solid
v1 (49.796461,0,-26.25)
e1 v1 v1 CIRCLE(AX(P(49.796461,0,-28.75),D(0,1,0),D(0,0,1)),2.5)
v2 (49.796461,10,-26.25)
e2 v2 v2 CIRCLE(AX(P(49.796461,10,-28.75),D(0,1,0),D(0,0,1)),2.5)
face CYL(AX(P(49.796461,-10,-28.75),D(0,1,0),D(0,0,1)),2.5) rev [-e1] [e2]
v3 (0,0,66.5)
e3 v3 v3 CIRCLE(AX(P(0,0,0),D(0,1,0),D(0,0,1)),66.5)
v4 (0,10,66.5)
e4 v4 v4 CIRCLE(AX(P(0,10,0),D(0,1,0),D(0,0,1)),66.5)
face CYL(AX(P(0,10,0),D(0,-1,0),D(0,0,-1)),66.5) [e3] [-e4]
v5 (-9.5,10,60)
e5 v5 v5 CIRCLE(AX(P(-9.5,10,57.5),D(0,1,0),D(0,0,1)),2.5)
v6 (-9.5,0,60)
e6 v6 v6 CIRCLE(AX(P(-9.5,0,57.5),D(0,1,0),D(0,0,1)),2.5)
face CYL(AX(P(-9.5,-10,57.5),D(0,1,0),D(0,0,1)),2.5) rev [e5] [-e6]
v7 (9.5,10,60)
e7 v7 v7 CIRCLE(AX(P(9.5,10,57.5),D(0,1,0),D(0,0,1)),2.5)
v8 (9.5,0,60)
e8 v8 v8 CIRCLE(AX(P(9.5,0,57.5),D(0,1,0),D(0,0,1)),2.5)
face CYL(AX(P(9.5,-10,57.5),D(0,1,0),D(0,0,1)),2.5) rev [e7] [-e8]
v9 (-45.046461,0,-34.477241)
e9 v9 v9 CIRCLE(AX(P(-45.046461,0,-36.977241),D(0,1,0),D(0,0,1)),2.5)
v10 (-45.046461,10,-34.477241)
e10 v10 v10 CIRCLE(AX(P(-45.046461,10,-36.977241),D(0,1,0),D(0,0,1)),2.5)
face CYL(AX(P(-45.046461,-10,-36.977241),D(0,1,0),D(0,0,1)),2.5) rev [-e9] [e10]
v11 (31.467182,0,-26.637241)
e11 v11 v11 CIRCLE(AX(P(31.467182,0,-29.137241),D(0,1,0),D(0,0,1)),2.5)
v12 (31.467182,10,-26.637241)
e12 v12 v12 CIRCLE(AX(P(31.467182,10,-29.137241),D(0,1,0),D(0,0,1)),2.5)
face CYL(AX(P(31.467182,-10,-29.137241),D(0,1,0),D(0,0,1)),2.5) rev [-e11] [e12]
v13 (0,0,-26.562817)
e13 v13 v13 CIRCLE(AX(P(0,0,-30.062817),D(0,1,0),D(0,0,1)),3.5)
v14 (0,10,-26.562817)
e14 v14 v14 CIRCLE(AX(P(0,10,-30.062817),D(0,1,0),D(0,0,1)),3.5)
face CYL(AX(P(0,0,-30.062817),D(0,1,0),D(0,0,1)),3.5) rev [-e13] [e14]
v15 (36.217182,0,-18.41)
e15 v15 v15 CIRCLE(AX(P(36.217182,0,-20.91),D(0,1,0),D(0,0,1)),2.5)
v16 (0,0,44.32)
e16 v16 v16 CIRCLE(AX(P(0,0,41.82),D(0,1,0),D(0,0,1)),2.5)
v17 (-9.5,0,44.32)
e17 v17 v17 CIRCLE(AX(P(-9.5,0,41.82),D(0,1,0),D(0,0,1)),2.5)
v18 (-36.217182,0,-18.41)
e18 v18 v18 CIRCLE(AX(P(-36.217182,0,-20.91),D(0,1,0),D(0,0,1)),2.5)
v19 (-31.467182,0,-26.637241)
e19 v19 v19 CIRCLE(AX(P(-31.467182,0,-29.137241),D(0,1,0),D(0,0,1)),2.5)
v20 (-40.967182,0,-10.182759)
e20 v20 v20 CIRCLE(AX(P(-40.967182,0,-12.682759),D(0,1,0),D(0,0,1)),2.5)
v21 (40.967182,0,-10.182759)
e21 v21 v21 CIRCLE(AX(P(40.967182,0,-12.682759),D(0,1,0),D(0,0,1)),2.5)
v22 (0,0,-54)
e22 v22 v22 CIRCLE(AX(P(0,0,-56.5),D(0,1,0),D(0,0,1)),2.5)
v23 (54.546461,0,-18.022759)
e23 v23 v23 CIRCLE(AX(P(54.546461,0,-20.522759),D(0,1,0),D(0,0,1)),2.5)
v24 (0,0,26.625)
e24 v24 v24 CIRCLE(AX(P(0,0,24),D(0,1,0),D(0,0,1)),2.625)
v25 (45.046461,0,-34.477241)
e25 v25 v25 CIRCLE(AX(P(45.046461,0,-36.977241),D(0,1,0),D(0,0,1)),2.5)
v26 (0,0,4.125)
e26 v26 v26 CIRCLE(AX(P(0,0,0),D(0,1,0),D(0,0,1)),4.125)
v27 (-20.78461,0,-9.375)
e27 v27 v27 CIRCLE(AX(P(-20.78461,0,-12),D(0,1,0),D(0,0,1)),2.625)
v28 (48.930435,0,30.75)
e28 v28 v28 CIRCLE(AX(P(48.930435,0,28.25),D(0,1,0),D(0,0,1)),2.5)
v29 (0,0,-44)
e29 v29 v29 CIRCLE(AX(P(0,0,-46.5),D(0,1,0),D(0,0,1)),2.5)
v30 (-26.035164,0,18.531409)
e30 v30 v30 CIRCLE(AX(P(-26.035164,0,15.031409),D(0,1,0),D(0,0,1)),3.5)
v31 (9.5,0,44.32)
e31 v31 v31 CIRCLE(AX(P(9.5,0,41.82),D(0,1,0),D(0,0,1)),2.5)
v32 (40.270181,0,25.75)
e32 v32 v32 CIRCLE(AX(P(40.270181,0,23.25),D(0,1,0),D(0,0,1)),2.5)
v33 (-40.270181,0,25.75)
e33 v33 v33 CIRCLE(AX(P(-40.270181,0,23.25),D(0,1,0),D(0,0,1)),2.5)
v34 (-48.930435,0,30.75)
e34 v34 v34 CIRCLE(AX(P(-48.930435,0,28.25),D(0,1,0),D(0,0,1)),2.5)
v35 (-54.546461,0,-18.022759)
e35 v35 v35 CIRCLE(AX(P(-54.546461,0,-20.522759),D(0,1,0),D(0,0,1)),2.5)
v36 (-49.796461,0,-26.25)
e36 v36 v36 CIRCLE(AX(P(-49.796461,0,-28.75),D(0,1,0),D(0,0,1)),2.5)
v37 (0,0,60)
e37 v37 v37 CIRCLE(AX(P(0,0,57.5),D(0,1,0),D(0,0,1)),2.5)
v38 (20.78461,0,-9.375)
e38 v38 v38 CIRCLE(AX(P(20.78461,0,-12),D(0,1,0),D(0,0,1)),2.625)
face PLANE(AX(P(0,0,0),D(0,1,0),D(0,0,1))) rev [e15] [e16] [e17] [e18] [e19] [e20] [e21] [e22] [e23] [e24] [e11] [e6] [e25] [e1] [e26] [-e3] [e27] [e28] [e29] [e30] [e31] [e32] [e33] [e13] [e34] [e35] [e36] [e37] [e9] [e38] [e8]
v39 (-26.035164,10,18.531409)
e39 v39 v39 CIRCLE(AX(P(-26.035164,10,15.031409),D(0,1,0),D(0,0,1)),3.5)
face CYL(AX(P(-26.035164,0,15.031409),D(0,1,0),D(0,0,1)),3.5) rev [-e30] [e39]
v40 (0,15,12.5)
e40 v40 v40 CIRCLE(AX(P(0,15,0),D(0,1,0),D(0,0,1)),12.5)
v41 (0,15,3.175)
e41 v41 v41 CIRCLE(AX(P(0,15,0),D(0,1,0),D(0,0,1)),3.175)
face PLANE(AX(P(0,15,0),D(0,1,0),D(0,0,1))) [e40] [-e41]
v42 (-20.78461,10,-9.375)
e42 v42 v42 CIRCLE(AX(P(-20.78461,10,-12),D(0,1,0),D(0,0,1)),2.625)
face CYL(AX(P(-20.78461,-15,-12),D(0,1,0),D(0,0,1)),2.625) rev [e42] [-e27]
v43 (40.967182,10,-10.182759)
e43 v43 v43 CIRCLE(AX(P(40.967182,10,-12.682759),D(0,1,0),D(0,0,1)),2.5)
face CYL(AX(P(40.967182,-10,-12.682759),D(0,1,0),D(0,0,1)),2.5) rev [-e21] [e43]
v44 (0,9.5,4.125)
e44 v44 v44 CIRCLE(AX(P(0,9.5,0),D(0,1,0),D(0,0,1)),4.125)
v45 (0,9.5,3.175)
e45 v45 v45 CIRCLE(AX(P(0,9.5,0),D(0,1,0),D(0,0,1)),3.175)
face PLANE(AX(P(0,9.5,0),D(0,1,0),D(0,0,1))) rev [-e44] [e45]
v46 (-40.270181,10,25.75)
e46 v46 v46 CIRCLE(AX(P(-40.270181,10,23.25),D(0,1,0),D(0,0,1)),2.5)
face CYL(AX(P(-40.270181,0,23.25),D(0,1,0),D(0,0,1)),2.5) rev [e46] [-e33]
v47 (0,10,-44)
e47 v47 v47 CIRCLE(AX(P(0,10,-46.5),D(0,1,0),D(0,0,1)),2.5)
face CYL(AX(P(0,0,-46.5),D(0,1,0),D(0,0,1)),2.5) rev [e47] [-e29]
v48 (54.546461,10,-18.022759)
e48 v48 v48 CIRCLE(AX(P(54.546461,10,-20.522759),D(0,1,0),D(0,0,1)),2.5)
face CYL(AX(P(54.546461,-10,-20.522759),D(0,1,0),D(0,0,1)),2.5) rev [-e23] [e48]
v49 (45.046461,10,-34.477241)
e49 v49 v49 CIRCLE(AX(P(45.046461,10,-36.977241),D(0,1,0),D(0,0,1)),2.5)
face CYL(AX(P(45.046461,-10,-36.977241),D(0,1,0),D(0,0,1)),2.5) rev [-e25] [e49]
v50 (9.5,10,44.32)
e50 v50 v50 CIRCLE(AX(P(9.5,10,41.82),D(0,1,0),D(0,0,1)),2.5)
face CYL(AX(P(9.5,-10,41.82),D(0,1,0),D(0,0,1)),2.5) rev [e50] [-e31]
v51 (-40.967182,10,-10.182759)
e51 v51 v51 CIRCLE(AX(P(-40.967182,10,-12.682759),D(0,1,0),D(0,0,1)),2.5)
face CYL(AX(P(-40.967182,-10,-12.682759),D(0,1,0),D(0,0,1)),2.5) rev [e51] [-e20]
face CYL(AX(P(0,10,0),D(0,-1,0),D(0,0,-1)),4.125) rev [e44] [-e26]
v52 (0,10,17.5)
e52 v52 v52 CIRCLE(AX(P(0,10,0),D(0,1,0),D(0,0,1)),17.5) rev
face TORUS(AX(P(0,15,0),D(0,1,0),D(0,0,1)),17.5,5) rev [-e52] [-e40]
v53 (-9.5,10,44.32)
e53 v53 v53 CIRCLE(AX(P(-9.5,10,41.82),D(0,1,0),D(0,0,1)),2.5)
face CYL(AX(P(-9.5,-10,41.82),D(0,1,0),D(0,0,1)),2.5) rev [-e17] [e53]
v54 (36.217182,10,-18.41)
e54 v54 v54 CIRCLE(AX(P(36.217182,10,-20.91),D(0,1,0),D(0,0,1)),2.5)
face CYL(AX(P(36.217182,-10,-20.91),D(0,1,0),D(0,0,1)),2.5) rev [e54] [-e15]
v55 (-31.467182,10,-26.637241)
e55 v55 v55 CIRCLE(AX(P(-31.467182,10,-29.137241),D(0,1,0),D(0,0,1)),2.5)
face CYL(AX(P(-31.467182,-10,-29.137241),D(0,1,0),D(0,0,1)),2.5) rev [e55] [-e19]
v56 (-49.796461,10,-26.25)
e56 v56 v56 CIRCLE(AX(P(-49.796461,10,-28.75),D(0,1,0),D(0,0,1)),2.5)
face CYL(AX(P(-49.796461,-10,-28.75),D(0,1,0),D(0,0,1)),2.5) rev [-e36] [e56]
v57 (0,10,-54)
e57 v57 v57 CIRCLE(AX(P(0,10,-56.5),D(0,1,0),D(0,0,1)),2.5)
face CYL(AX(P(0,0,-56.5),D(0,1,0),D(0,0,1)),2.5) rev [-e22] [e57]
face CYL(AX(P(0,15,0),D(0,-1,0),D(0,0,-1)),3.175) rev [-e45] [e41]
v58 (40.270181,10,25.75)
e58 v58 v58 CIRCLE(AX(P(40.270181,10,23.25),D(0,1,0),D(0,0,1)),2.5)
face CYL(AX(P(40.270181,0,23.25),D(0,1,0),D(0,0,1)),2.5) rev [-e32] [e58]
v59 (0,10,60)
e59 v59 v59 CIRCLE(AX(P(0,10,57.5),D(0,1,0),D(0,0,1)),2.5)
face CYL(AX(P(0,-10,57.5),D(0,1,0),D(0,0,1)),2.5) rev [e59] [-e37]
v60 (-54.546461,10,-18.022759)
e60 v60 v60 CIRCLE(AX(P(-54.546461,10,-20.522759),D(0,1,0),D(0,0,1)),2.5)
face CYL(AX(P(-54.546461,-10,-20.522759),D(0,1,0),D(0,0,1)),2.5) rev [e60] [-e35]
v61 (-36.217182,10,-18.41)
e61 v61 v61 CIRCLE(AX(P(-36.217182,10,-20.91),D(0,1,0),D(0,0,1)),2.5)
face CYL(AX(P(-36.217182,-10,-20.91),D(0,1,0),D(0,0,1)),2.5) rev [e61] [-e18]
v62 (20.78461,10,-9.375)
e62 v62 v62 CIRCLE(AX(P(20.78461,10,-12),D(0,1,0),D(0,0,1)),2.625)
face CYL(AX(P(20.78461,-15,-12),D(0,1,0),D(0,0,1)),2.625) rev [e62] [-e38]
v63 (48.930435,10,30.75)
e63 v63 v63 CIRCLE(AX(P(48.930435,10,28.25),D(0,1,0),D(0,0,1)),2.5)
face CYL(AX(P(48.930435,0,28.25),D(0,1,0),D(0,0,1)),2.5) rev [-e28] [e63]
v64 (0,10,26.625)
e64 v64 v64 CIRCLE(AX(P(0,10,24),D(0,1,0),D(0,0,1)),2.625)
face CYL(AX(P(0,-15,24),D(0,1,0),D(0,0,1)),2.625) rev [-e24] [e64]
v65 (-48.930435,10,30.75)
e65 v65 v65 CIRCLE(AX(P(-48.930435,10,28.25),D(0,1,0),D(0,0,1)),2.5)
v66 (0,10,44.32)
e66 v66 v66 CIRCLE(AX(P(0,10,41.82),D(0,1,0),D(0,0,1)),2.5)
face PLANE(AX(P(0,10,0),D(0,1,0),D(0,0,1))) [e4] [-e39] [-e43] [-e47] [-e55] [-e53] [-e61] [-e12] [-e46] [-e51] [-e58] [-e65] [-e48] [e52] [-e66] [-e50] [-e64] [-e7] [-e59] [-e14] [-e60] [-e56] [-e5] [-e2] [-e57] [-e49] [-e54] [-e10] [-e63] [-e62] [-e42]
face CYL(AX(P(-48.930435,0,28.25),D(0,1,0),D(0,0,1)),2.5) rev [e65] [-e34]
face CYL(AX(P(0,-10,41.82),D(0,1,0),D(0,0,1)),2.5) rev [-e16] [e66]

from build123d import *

# Parameters (mm, degrees)
BOSS_EXTRUDE7_DEPTH = 10
SKETCH1_23_R        = 65.000000017
SKETCH1_23_R_2      = 4.125
BOSS_EXTRUDE8_DEPTH = 10
CUT_EXTRUDE1_START  = 65
SKETCH16_R          = 2.5
CUT_EXTRUDE1_DEPTH  = 20
BOSS_EXTRUDE9_START = -0.5
SKETCH17_R          = 12.5
SKETCH17_R_2        = 3.175
BOSS_EXTRUDE9_DEPTH = 5.5
FILLET1_R           = 5
SKETCH18_R          = 2.5
SKETCH18_R_2        = 3.5
CUT_EXTRUDE2_DEPTH  = 10
SKETCH20_R          = 2.625
CUT_EXTRUDE11_DEPTH = 25


with BuildPart() as part:
    # Sketch1 → Boss-Extrude7 (new body)
    with BuildSketch(Plane(origin=(0, 0, 0), x_dir=(1, 0, 0), z_dir=(0, 1, 0))):
        with BuildLine():
            ThreePointArc((-10.099280768, -64.210626285), (-56.291651246, -32.5), (-60.65767394, 23.359079438))
            Line((-60.65767394, 23.359079438), (-64.257390064, 17.124188218))
            ThreePointArc((-64.257390064, 17.124188218), (-57.590689352, -33.25), (-17.298713017, -64.210626285))
            Line((-17.298713017, -64.210626285), (-10.099280768, -64.210626285))
        make_face()
        with BuildLine():
            Line((-64.257390064, 17.124188218), (-60.65767394, 23.359079438))
            ThreePointArc((-60.65767394, 23.359079438), (-60.639599413, 23.405960416), (-60.621488653, 23.452827409))
            Line((-60.621488653, 23.452827409), (-61.93581913, 24.211656463))
            ThreePointArc((-61.93581913, 24.211656463), (-63.196040724, 20.700493636), (-64.257390064, 17.124188218))
        make_face()
        with BuildLine():
            ThreePointArc((-60.621488653, 23.452827409), (-59.667920988, 25.782536821), (-58.624860802, 28.073576473))
            ThreePointArc((-58.624860802, 28.073576473), (-54.991019149, 34.65527107), (-50.621488653, 40.773335485))
            Line((-50.621488653, 40.773335485), (-51.93581913, 41.532164539))
            ThreePointArc((-51.93581913, 41.532164539), (-57.590689352, 33.25), (-61.93581913, 24.211656463))
            Line((-61.93581913, 24.211656463), (-60.621488653, 23.452827409))
        make_face()
        with BuildLine():
            ThreePointArc((-50.621488653, 40.773335485), (-50.589956027, 40.812453359), (-50.558393172, 40.851546848))
            Line((-50.558393172, 40.851546848), (-46.958677048, 47.086438068))
            ThreePointArc((-46.958677048, 47.086438068), (-49.525173722, 44.379129868), (-51.93581913, 41.532164539))
            Line((-51.93581913, 41.532164539), (-50.621488653, 40.773335485))
        make_face()
        with BuildLine():
            Line((-46.958677048, 47.086438068), (-50.558393172, 40.851546848))
            ThreePointArc((-50.558393172, 40.851546848), (0, 65), (50.558393172, 40.851546848))
            Line((50.558393172, 40.851546848), (46.958677048, 47.086438068))
            ThreePointArc((46.958677048, 47.086438068), (0, 66.5), (-46.958677048, 47.086438068))
        make_face()
        with BuildLine():
            Line((46.958677048, 47.086438068), (50.558393172, 40.851546848))
            ThreePointArc((50.558393172, 40.851546848), (50.589956027, 40.812453359), (50.621488653, 40.773335485))
            Line((50.621488653, 40.773335485), (51.93581913, 41.532164539))
            ThreePointArc((51.93581913, 41.532164539), (49.525173722, 44.379129868), (46.958677048, 47.086438068))
        make_face()
        with BuildLine():
            Line((51.93581913, 41.532164539), (50.621488653, 40.773335485))
            ThreePointArc((50.621488653, 40.773335485), (52.162292355, 38.782666956), (53.624860802, 36.733830511))
            ThreePointArc((53.624860802, 36.733830511), (57.507854696, 30.295984028), (60.621488653, 23.452827409))
            Line((60.621488653, 23.452827409), (61.93581913, 24.211656463))
            ThreePointArc((61.93581913, 24.211656463), (57.590689352, 33.25), (51.93581913, 41.532164539))
        make_face()
        with BuildLine():
            ThreePointArc((64.257390064, 17.124188218), (63.196040724, 20.700493636), (61.93581913, 24.211656463))
            Line((61.93581913, 24.211656463), (60.621488653, 23.452827409))
            ThreePointArc((60.621488653, 23.452827409), (60.639599413, 23.405960416), (60.65767394, 23.359079438))
            Line((60.65767394, 23.359079438), (64.257390064, 17.124188218))
        make_face()
        with BuildLine():
            ThreePointArc((66.5, 0), (65.936963986, 8.635205867), (64.257390064, 17.124188218))
            Line((64.257390064, 17.124188218), (60.65767394, 23.359079438))
            ThreePointArc((60.65767394, 23.359079438), (63.90519856, 11.879629495), (65, 0))
            ThreePointArc((65, 0), (49.40371064, -42.240660211), (10.099280768, -64.210626285))
            Line((10.099280768, -64.210626285), (17.298713017, -64.210626285))
            ThreePointArc((17.298713017, -64.210626285), (52.785482927, -40.44678964), (66.5, 0))
        make_face()
        with BuildLine():
            ThreePointArc((-10, -64.226162893), (-10.049643386, -64.218413775), (-10.099280768, -64.210626285))
            Line((-10.099280768, -64.210626285), (-17.298713017, -64.210626285))
            ThreePointArc((-17.298713017, -64.210626285), (-13.670867002, -65.079623504), (-10, -65.743821002))
            Line((-10, -65.743821002), (-10, -64.226162893))
        make_face()
        with BuildLine():
            ThreePointArc((5, -64.807406984), (-2.516835548, -64.951255098), (-10, -64.226162893))
            Line((-10, -64.226162893), (-10, -65.743821002))
            ThreePointArc((-10, -65.743821002), (0, -66.5), (10, -65.743821002))
            Line((10, -65.743821002), (10, -64.226162893))
            ThreePointArc((10, -64.226162893), (7.505628633, -64.565203777), (5, -64.807406984))
        make_face()
        with BuildLine():
            Line((10, -64.226162893), (10, -65.743821002))
            ThreePointArc((10, -65.743821002), (13.670867002, -65.079623504), (17.298713017, -64.210626285))
            Line((17.298713017, -64.210626285), (10.099280768, -64.210626285))
            ThreePointArc((10.099280768, -64.210626285), (10.049643386, -64.218413775), (10, -64.226162893))
        make_face()
    extrude(amount=BOSS_EXTRUDE7_DEPTH)

    # Sketch1<23> → Boss-Extrude8 (add)
    with BuildSketch(Plane(origin=(0, 0, 0), x_dir=(1, 0, 0), z_dir=(0, 1, 0))):
        with Locations((-3e-09, 1.7e-08)):
            Circle(SKETCH1_23_R)
        with Locations(Location((0, 0, 0), (0, 0, 270))):
            Circle(SKETCH1_23_R_2, mode=Mode.SUBTRACT)
    extrude(amount=BOSS_EXTRUDE8_DEPTH)

    # Sketch16 → Cut-Extrude1 (cut)
    with BuildSketch(Plane.XZ.offset(-75).offset(CUT_EXTRUDE1_START)):
        with Locations(Location((36.217182386, -20.91, 0), (0, 0, 90))):
            Circle(SKETCH16_R)
        with Locations(Location((49.796460718, -28.75, 0), (0, 0, 90))):
            Circle(SKETCH16_R)
        with Locations(Location((-40.967182386, -12.682758664, 0), (0, 0, 90))):
            Circle(SKETCH16_R)
        with Locations(Location((-36.217182386, -20.91, 0), (0, 0, 90))):
            Circle(SKETCH16_R)
        with Locations(Location((-49.796460718, -28.75, 0), (0, 0, 90))):
            Circle(SKETCH16_R)
        with Locations(Location((0, 41.82, 0), (0, 0, 90))):
            Circle(SKETCH16_R)
        with Locations(Location((0, 57.5, 0), (0, 0, 90))):
            Circle(SKETCH16_R)
        with Locations(Location((-31.467182386, -29.137241336, 0), (0, 0, 90))):
            Circle(SKETCH16_R)
        with Locations(Location((-45.046460718, -36.977241336, 0), (0, 0, 90))):
            Circle(SKETCH16_R)
        with Locations(Location((-54.546460718, -20.522758664, 0), (0, 0, 90))):
            Circle(SKETCH16_R)
        with Locations(Location((9.5, 41.82, 0), (0, 0, 90))):
            Circle(SKETCH16_R)
        with Locations(Location((-9.5, 41.82, 0), (0, 0, 90))):
            Circle(SKETCH16_R)
        with Locations(Location((-9.5, 57.5, 0), (0, 0, 90))):
            Circle(SKETCH16_R)
        with Locations(Location((9.5, 57.5, 0), (0, 0, 90))):
            Circle(SKETCH16_R)
        with Locations(Location((31.467182386, -29.137241336, 0), (0, 0, 90))):
            Circle(SKETCH16_R)
        with Locations(Location((40.967182386, -12.682758664, 0), (0, 0, 90))):
            Circle(SKETCH16_R)
        with Locations(Location((54.546460718, -20.522758664, 0), (0, 0, 90))):
            Circle(SKETCH16_R)
        with Locations(Location((45.046460718, -36.977241336, 0), (0, 0, 90))):
            Circle(SKETCH16_R)
    extrude(amount=CUT_EXTRUDE1_DEPTH, mode=Mode.SUBTRACT)

    # Sketch17 → Boss-Extrude9 (add)
    with BuildSketch(Plane(origin=(0, 10, 0), x_dir=(1, 0, 0), z_dir=(0, 1, 0)).offset(BOSS_EXTRUDE9_START)):
        with Locations(Location((0, 0, 0), (0, 0, 270))):
            Circle(SKETCH17_R)
        with Locations(Location((0, 0, 0), (0, 0, 270))):
            Circle(SKETCH17_R_2, mode=Mode.SUBTRACT)
    extrude(amount=BOSS_EXTRUDE9_DEPTH)

    # Fillet1
    fillet1_edges = [part.edges().sort_by_distance(p)[0] for p in [
        (0, 10, -12.5),
    ]]
    fillet(fillet1_edges, radius=FILLET1_R - 0.0001)  # a hair under: the kernel refuses the full size

    # Sketch18 → Cut-Extrude2 (cut)
    with BuildSketch(Plane(origin=(0, 10, 0), x_dir=(1, 0, 0), z_dir=(0, 1, 0))):
        with Locations(Location((0, 56.5, 0), (0, 0, 270))):
            Circle(SKETCH18_R)
        with Locations(Location((0, 46.5, 0), (0, 0, 270))):
            Circle(SKETCH18_R)
        with Locations(Location((40.270181276, -23.25, 0), (0, 0, 270))):
            Circle(SKETCH18_R)
        with Locations(Location((48.930435314, -28.25, 0), (0, 0, 270))):
            Circle(SKETCH18_R)
        with Locations(Location((-40.270181276, -23.25, 0), (0, 0, 270))):
            Circle(SKETCH18_R)
        with Locations(Location((-48.930435314, -28.25, 0), (0, 0, 270))):
            Circle(SKETCH18_R)
        with Locations(Location((-26.035163591, -15.031408708, 0), (0, 0, 270))):
            Circle(SKETCH18_R_2)
        with Locations(Location((0, 30.062817415, 0), (0, 0, 270))):
            Circle(SKETCH18_R_2)
    extrude(amount=-CUT_EXTRUDE2_DEPTH, mode=Mode.SUBTRACT)

    # Sketch20 → Cut-Extrude11 (cut)
    with BuildSketch(Plane(origin=(0, 10, 0), x_dir=(1, 0, 0), z_dir=(0, 1, 0))):
        with Locations(Location((-20.784609691, 12, 0), (0, 0, 270))):
            Circle(SKETCH20_R)
        with Locations(Location((0, -24, 0), (0, 0, 270))):
            Circle(SKETCH20_R)
        with Locations(Location((20.784609691, 12, 0), (0, 0, 270))):
            Circle(SKETCH20_R)
    extrude(amount=-CUT_EXTRUDE11_DEPTH, mode=Mode.SUBTRACT)


solid = part.part
